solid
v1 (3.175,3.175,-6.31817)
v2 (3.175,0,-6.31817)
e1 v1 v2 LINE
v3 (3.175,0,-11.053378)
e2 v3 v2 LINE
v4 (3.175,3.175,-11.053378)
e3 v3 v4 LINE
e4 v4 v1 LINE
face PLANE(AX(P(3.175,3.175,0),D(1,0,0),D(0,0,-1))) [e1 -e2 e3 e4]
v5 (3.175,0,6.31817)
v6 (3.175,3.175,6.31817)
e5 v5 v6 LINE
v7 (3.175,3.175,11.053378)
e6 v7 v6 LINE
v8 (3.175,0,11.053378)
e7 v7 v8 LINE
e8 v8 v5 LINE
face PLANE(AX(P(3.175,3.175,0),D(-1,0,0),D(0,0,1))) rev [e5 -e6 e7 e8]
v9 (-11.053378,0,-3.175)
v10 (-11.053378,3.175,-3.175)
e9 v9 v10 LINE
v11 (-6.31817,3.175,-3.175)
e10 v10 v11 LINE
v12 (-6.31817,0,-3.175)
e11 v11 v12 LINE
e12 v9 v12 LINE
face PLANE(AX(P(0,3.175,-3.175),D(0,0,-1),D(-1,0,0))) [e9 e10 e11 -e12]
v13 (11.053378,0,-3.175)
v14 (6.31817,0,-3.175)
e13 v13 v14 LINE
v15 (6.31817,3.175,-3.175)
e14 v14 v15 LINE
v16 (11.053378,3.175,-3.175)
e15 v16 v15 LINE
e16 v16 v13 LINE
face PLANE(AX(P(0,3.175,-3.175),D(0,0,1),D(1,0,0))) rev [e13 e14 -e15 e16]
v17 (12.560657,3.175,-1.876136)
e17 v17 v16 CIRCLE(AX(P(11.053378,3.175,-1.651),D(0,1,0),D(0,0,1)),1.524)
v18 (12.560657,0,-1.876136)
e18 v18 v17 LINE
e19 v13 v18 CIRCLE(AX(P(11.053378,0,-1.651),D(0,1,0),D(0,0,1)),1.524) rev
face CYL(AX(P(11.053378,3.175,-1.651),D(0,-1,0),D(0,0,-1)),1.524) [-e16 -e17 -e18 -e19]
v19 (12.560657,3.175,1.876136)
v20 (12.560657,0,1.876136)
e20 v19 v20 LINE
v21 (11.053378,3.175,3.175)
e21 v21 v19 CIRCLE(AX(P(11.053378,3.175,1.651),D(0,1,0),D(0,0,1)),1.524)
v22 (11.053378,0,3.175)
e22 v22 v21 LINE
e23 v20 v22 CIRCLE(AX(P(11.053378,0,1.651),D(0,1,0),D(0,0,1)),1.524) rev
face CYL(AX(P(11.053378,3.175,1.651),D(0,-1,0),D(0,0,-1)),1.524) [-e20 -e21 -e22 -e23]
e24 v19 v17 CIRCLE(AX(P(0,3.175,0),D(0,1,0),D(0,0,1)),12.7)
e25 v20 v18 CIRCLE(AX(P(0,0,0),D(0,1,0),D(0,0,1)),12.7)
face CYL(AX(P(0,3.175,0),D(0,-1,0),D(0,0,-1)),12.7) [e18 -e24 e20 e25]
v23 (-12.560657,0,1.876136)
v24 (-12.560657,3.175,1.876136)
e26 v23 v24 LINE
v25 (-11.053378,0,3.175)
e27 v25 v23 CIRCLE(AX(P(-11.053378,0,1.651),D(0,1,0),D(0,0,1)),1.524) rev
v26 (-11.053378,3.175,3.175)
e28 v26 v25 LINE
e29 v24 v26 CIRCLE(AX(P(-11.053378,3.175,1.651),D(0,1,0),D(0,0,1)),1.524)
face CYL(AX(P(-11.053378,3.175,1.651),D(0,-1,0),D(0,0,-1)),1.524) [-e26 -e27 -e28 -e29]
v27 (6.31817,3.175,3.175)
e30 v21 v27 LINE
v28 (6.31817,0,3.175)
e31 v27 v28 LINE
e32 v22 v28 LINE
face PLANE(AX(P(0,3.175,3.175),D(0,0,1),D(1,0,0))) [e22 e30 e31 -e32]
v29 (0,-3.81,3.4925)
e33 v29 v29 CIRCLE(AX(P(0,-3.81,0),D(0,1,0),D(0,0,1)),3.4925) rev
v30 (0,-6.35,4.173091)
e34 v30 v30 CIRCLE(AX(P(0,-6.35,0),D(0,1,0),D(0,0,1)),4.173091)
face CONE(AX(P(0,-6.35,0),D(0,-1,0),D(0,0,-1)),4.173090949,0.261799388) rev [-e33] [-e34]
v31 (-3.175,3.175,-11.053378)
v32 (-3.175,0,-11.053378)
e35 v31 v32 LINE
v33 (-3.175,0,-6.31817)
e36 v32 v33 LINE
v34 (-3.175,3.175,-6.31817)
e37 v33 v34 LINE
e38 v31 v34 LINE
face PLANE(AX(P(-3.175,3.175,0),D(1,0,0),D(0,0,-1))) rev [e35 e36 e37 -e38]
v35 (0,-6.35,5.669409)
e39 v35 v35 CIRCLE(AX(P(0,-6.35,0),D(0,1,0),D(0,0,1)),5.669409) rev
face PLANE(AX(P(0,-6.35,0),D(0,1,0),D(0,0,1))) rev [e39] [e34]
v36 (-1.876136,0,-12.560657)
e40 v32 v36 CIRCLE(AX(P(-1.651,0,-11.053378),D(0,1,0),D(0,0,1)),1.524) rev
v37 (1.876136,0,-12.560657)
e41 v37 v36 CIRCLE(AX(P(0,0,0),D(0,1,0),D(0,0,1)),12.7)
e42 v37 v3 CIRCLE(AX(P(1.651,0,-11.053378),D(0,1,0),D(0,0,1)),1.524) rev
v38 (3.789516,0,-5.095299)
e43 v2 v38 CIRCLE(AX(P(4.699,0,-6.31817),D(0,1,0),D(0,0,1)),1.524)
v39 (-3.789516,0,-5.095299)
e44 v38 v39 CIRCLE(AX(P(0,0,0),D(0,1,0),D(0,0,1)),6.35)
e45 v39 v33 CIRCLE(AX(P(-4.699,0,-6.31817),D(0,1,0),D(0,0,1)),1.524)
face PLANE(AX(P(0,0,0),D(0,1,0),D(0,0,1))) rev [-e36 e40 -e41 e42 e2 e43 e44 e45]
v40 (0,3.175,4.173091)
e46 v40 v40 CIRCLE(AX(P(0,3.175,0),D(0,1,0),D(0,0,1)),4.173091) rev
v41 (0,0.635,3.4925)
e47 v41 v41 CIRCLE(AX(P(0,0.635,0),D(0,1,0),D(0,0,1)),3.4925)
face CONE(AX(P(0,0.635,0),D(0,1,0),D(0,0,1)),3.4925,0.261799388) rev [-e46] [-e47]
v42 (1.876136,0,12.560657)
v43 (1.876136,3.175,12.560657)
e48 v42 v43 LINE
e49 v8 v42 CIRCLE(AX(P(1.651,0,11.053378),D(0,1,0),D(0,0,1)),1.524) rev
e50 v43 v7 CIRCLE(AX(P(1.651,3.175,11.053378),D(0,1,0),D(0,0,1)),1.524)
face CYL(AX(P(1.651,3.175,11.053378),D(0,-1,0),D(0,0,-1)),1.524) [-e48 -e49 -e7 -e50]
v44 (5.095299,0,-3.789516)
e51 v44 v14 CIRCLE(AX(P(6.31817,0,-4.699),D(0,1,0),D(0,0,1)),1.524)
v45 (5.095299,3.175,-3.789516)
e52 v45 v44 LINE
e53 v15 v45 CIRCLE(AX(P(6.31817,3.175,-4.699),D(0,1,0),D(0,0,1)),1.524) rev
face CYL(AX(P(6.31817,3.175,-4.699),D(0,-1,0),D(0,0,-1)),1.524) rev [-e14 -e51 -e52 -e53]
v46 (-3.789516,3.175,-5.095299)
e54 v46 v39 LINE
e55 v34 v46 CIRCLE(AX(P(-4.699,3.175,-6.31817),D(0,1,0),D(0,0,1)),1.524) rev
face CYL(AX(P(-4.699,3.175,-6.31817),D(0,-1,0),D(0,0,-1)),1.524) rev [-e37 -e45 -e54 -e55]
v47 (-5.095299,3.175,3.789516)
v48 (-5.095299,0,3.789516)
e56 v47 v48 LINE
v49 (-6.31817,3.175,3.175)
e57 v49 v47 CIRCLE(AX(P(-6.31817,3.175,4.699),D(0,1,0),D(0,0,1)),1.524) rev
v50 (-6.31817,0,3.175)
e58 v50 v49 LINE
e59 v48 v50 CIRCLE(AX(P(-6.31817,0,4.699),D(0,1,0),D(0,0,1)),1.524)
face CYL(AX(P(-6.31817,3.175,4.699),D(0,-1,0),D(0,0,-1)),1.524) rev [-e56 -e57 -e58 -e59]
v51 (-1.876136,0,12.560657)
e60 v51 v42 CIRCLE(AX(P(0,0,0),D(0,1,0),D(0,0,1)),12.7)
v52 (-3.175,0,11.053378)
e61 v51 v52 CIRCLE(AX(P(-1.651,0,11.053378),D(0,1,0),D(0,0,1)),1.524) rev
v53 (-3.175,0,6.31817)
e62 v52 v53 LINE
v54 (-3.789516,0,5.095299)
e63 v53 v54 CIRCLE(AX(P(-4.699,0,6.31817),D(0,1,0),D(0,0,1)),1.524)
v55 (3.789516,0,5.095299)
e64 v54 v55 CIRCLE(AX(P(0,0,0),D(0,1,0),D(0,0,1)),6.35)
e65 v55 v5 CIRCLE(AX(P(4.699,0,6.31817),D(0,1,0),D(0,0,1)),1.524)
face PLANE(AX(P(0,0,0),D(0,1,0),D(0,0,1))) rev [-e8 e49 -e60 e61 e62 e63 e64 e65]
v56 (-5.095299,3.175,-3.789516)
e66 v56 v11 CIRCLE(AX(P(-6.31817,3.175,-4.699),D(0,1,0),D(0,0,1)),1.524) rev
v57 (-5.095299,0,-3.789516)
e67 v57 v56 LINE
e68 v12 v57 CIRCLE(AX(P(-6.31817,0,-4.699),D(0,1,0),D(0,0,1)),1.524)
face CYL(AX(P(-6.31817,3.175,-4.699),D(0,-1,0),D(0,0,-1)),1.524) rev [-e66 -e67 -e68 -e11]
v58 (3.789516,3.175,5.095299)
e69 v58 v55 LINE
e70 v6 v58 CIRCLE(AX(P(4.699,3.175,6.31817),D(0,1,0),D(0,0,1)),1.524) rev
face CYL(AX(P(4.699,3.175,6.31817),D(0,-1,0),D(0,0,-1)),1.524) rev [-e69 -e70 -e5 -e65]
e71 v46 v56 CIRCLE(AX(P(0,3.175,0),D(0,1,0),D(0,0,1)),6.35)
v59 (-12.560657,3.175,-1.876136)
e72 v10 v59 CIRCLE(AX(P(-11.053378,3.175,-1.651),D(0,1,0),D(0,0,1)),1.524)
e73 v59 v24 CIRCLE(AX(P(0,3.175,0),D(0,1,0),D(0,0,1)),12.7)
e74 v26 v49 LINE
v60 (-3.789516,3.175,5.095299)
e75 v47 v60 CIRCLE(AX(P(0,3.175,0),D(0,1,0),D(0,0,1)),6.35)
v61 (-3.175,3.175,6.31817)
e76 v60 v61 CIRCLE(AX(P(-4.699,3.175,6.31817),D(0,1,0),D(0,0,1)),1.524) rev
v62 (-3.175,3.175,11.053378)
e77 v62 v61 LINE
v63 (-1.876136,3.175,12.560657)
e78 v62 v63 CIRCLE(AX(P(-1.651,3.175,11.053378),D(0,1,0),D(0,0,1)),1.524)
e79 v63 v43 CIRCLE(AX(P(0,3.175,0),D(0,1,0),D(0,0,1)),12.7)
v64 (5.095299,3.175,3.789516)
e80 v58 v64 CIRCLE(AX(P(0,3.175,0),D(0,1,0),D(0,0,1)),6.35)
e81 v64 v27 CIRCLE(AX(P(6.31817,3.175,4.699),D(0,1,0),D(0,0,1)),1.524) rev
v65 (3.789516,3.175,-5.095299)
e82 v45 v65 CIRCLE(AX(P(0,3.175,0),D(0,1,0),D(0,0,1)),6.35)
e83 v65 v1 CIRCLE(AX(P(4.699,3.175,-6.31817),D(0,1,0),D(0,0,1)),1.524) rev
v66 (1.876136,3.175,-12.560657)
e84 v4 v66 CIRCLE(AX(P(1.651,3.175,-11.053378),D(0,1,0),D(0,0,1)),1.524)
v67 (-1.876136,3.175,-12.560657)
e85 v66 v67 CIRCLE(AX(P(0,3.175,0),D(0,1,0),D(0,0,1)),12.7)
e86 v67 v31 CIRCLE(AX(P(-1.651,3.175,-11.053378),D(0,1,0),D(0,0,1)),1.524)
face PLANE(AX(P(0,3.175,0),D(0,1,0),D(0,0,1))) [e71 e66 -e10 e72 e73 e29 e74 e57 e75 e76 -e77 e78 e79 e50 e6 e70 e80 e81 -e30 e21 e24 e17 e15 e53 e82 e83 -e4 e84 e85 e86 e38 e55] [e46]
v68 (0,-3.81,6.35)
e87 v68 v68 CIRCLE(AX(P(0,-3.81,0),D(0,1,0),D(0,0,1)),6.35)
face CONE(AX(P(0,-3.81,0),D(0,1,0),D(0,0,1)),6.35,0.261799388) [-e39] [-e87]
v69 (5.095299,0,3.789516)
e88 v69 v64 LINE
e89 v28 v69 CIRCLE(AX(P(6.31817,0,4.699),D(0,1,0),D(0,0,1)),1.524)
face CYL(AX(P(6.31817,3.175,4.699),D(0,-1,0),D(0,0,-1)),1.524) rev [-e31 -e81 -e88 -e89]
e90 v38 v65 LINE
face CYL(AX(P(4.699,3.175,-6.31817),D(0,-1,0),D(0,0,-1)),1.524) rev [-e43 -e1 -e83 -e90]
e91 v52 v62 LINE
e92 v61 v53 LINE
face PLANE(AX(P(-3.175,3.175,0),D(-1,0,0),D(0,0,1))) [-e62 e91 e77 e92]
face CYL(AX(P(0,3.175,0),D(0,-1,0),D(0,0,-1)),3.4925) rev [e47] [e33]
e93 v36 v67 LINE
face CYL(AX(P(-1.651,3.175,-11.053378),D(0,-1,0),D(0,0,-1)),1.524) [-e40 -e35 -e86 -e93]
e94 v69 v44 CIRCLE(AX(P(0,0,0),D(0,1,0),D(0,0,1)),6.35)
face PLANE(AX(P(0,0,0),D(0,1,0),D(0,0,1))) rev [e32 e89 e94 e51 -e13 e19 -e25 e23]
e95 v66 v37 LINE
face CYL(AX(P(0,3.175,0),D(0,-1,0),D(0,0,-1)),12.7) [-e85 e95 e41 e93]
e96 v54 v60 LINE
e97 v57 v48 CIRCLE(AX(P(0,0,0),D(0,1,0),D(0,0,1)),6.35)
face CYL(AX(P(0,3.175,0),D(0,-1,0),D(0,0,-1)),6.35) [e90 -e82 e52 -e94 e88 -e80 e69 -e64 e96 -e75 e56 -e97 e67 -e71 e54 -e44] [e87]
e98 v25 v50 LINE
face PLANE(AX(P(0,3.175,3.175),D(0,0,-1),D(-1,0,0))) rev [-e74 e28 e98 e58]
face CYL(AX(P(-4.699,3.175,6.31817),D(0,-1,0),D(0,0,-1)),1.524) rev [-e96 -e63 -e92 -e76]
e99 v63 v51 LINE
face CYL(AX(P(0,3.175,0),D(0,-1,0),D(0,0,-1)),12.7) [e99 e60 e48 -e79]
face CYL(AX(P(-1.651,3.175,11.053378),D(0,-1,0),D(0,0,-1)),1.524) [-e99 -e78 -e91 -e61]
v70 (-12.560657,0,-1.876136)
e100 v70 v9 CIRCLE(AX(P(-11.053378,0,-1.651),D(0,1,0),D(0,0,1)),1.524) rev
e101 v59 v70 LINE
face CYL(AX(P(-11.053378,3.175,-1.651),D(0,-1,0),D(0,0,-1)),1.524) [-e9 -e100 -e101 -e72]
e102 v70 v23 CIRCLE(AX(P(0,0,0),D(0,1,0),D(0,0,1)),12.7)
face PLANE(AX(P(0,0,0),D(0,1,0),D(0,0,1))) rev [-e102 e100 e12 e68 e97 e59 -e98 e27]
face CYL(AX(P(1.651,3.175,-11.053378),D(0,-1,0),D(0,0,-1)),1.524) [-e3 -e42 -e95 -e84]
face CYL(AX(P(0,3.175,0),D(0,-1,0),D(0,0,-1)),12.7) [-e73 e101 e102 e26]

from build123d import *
from OCP.BRepFilletAPI import BRepFilletAPI_MakeChamfer

# Parameters (mm, degrees)
SKETCH1_R           = 3.492500000000002
BOSS_EXTRUDE1_DEPTH = 3.175
BOSS_EXTRUDE2_START = -6.35
SKETCH1_3_R         = 3.4925
BOSS_EXTRUDE2_DEPTH = 6.35
CHAMFER1_SIZE       = 2.54
CHAMFER1_SIZE2      = 0.6805909487750533
FILLET2_R           = 1.524


with BuildPart() as part:
    # Sketch1 → Boss-Extrude1 (new body)
    with BuildSketch(Plane(origin=(0, 0, 0), x_dir=(1, 0, 0), z_dir=(0, 1, 0))):
        with BuildLine():
            ThreePointArc((-3.1750000000000007, 5.499261314031186), (-4.490128060534577, 4.490128060534578), (-5.499261314031186, 3.1750000000000016))
            Line((-5.499261314031183, 3.1750000000000007), (-12.296722124208548, 3.1750000000000034))
            ThreePointArc((-12.296722124208548, 3.175000000000004), (-12.700000000000001, 1.56e-15), (-12.29672212420855, -3.175000000000001))
            Line((-12.296722124208545, -3.1750000000000003), (-5.499261314031183, -3.175000000000001))
            ThreePointArc((-5.499261314031185, -3.175000000000003), (-4.490128060534575, -4.490128060534579), (-3.174999999999998, -5.499261314031186))
            Line((-3.174999999999998, -5.499261314031185), (-3.1749999999999976, -12.296722124208545))
            ThreePointArc((-3.1750000000000047, -12.296722124208548), (-2.33e-15, -12.700000000000001), (3.175, -12.29672212420855))
            Line((3.175000000000002, -12.296722124208543), (3.175000000000001, -5.499261314031185))
            ThreePointArc((3.175, -5.499261314031186), (4.490128060534578, -4.490128060534577), (5.499261314031187, -3.1749999999999994))
            Line((5.499261314031186, -3.1749999999999985), (12.296722124208548, -3.1749999999999954))
            ThreePointArc((12.296722124208552, -3.174999999999996), (12.700000000000003, 4.44e-15), (12.296722124208548, 3.1750000000000043))
            Line((12.296722124208546, 3.1750000000000043), (5.499261314031185, 3.1750000000000007))
            ThreePointArc((5.499261314031187, 3.175), (4.490128060534579, 4.490128060534575), (3.1749999999999994, 5.499261314031187))
            Line((3.1749999999999994, 5.499261314031186), (3.175, 12.296722124208548))
            ThreePointArc((3.1750000000000003, 12.29672212420855), (8.9e-16, 12.700000000000001), (-3.1749999999999985, 12.29672212420855))
            Line((-3.1749999999999994, 12.29672212420855), (-3.175, 5.499261314031185))
        make_face()
        with Locations(Location((-1.22e-15, -1.22e-15, 0), (0, 0, 270))):
            Circle(SKETCH1_R, mode=Mode.SUBTRACT)
    extrude(amount=BOSS_EXTRUDE1_DEPTH)

    # Sketch1<3> → Boss-Extrude2 (add)
    with BuildSketch(Plane(origin=(0, 0, 0), x_dir=(1, 0, 0), z_dir=(0, 1, 0)).offset(BOSS_EXTRUDE2_START)):
        with BuildLine():
            ThreePointArc((3.174999999999999, 5.499261314031186), (-1.02e-15, 6.35), (-3.175000000000001, 5.499261314031184))
            ThreePointArc((-3.175000000000001, 5.499261314031184), (-4.490128060534576, 4.490128060534577), (-5.499261314031184, 3.175000000000002))
            ThreePointArc((-5.499261314031184, 3.175000000000002), (-6.35, 7.8e-16), (-5.499261314031185, -3.1750000000000007))
            ThreePointArc((-5.499261314031185, -3.1750000000000007), (-4.490128060534575, -4.490128060534578), (-3.174999999999997, -5.499261314031187))
            ThreePointArc((-3.174999999999997, -5.499261314031187), (-1.17e-15, -6.35), (3.1750000000000007, -5.499261314031185))
            ThreePointArc((3.1750000000000007, -5.499261314031185), (4.4901280605345795, -4.490128060534573), (5.499261314031187, -3.1749999999999976))
            ThreePointArc((5.499261314031187, -3.1749999999999976), (6.133628996935584, -1.6435009364010063), (6.35, -1.56e-15))
            ThreePointArc((6.35, 0), (6.133628996935584, 1.6435009364010074), (5.499261314031185, 3.1750000000000007))
            ThreePointArc((5.499261314031185, 3.1750000000000007), (4.490128060534575, 4.490128060534578), (3.174999999999999, 5.499261314031186))
        make_face()
        with Locations(Location((0, 0, 0), (0, 0, 270))):
            Circle(SKETCH1_3_R, mode=Mode.SUBTRACT)
    extrude(amount=BOSS_EXTRUDE2_DEPTH)

    # Chamfer1: one chamfer whose edges measure the first distance from different faces: ONE call of the kernel's chamfer builder (chamfer() names one face for all edges)
    chamfer1_edges_1 = [part.edges().sort_by_distance(p)[0] for p in [
        (3.174999999999999, -6.35, -5.499261314031194),
    ]]
    chamfer1_side_1 = [part.faces().sort_by_distance(p)[0] for p in [
        (3.1749999999999865, -3.175, -5.499261314031195),
    ]]
    chamfer1_edges_2 = [part.edges().sort_by_distance(p)[0] for p in [
        (1.07e-15, -6.35, -3.4925),
    ]]
    chamfer1_side_2 = [part.faces().sort_by_distance(p)[0] for p in [
        (1.07e-15, -3.175, -3.4925),
    ]]
    chamfer1_edges_3 = [part.edges().sort_by_distance(p)[0] for p in [
        (-1.5e-16, 3.175, -3.4925000000000006),
    ]]
    chamfer1_side_3 = [part.faces().sort_by_distance(p)[0] for p in [
        (-1.5e-16, 1.5875, -3.4925000000000006),
    ]]
    chamfer1 = BRepFilletAPI_MakeChamfer(part.part.solid().wrapped)
    for e in chamfer1_edges_1:
        chamfer1.Add(CHAMFER1_SIZE, CHAMFER1_SIZE2, e.wrapped, chamfer1_side_1[0].wrapped)  # the first distance lies on this face
    for e in chamfer1_edges_2:
        chamfer1.Add(CHAMFER1_SIZE, CHAMFER1_SIZE2, e.wrapped, chamfer1_side_2[0].wrapped)  # the first distance lies on this face
    for e in chamfer1_edges_3:
        chamfer1.Add(CHAMFER1_SIZE, CHAMFER1_SIZE2, e.wrapped, chamfer1_side_3[0].wrapped)  # the first distance lies on this face
    add(Compound.cast(chamfer1.Shape()), mode=Mode.REPLACE)

    # Fillet2
    # the kernel refuses this fillet: 1.524 mm, written as the material it adds along each edge
    with BuildSketch(Plane(origin=(3.174999999999999, 0, -5.499261314031187), x_dir=(0.8356194334098631, 0, 0.5493088043239243), z_dir=(0, 1, 0))) as fillet2_piece_1:
        with BuildLine():
            CenterArc((0.8236501414377054, 1.5214428185116744), FILLET2_R, 213.3196069721482, 53.36078605570344)
            Line((-0.44983387507892547, 0.684296200722013), (0, 0))
            ThreePointArc((0, 0), (0.36770095599897257, 0.01065492286802295), (0.7354019119979484, -1e-17))
        make_face()
    extrude(amount=3.175)
    with BuildSketch(Plane(origin=(5.499261314031186, 0, -3.1750000000000007), x_dir=(1, 0, -1.08e-15), z_dir=(0, 1, 0))) as fillet2_piece_2:
        with BuildLine():
            CenterArc((0.8189089115958533, 1.524), FILLET2_R, 216.63921394429647, 53.3607860557035)
            ThreePointArc((-0.40396274497712104, 0.6145161290322583), (-0.19307791187855783, 0.31311090745692627), (0, 0))
            Line((0, 0), (0.8189089115958526, 0))
        make_face()
    extrude(amount=3.175)
    with BuildSketch(Plane(origin=(5.499261314031186, 0, 3.174999999999999), x_dir=(-0.5493088043239248, 0, 0.8356194334098627), z_dir=(0, 1, 0))) as fillet2_piece_3:
        with BuildLine():
            CenterArc((0.8236501414377031, 1.521442818511675), FILLET2_R, 213.31960697214825, 53.3607860557035)
            Line((-0.44983387507892714, 0.6842962007220129), (0, 0))
            ThreePointArc((0, 0), (0.3677009559989749, 0.01065492286802371), (0.7354019119979491, 1e-17))
        make_face()
    extrude(amount=3.175)
    with BuildSketch(Plane(origin=(3.1750000000000007, 0, 5.499261314031186), x_dir=(1.08e-15, 0, 1), z_dir=(0, 1, 0))) as fillet2_piece_4:
        with BuildLine():
            CenterArc((0.8189089115958524, 1.524), FILLET2_R, 216.63921394429642, 53.36078605570356)
            ThreePointArc((-0.4039627449771237, 0.61451612903226), (-0.19307791187855872, 0.3131109074569276), (0, 0))
            Line((0, 0), (0.8189089115958508, 0))
        make_face()
    extrude(amount=3.175)
    with BuildSketch(Plane(origin=(-3.1749999999999976, 0, 5.499261314031186), x_dir=(-0.8356194334098629, 0, -0.5493088043239246), z_dir=(0, 1, 0))) as fillet2_piece_5:
        with BuildLine():
            CenterArc((0.8236501414377089, 1.5214428185116742), FILLET2_R, 213.3196069721482, 53.3607860557035)
            Line((-0.44983387507892214, 0.684296200722013), (0, 0))
            ThreePointArc((0, 0), (0.3677009559989767, 0.0106549228680226), (0.7354019119979527, 1e-17))
        make_face()
    extrude(amount=3.175)
    with BuildSketch(Plane(origin=(-5.499261314031184, 0, 3.1750000000000025), x_dir=(-1, 0, -1.08e-15), z_dir=(0, 1, 0))) as fillet2_piece_6:
        with BuildLine():
            CenterArc((0.81890891159585, 1.524), FILLET2_R, 216.6392139442966, 53.36078605570344)
            ThreePointArc((-0.40396274497712237, 0.6145161290322556), (-0.1930779118785585, 0.31311090745692494), (0, 0))
            Line((0, 0), (0.8189089115958517, 0))
        make_face()
    extrude(amount=3.175)
    with BuildSketch(Plane(origin=(-5.499261314031185, 0, -3.1750000000000016), x_dir=(0.5493088043239243, 0, -0.835619433409863), z_dir=(0, 1, 0))) as fillet2_piece_7:
        with BuildLine():
            CenterArc((0.8236501414377072, 1.5214428185116744), FILLET2_R, 213.31960697214814, 53.3607860557035)
            Line((-0.44983387507892447, 0.6842962007220147), (0, 0))
            ThreePointArc((0, 0), (0.3677009559989745, 0.01065492286802321), (0.7354019119979499, -1e-17))
        make_face()
    extrude(amount=3.175)
    with BuildSketch(Plane(origin=(-3.1750000000000007, 0, -5.499261314031186), x_dir=(1.08e-15, 0, -1), z_dir=(0, 1, 0))) as fillet2_piece_8:
        with BuildLine():
            CenterArc((0.8189089115958518, 1.524), FILLET2_R, 216.63921394429659, 53.3607860557035)
            ThreePointArc((-0.4039627449771215, 0.614516129032256), (-0.19307791187855938, 0.3131109074569254), (0, 0))
            Line((0, 0), (0.8189089115958534, 0))
        make_face()
    extrude(amount=3.175)
    # the kernel refuses this fillet: 1.524 mm, written as the material it takes off along each edge
    with BuildSketch(Plane(origin=(3.175, -3.313522044377113, -12.29672212420855), x_dir=(-0.9799720802882134, 0, -0.1991349337901098), z_dir=(0, 1, 0))) as fillet2_2_piece_1:
        with BuildLine():
            CenterArc((1.2458842886857948, 1.5219237330684425), FILLET2_R, 191.48637688209308, 81.5047584217437)
            Line((-0.24759316167344236, 1.218442093972315), (0, 0))
            ThreePointArc((0, 0), (0.662704408875422, -0.01730222442965028), (1.325408817750845, 1e-17))
        make_face()
    extrude(amount=9.802044088754226, mode=Mode.SUBTRACT)
    with BuildSketch(Plane(origin=(12.29672212420855, -3.313522044377107, -3.175000000000003), x_dir=(0.1991349337901089, 0, 0.9799720802882137), z_dir=(0, 1, 0))) as fillet2_2_piece_2:
        with BuildLine():
            CenterArc((1.2458842886857953, -1.521923733068443), FILLET2_R, 87.00886469616333, 81.50475842174347)
            Line((-0.24759316167344145, -1.218442093972312), (0, 0))
            ThreePointArc((0, 0), (0.6627044088754213, 0.01730222442965107), (1.3254088177508423, 1e-17))
        make_face()
    extrude(amount=9.802044088754215, mode=Mode.SUBTRACT)
    with BuildSketch(Plane(origin=(12.29672212420855, -3.3135220443771116, 3.1749999999999954), x_dir=(0.19913493379011118, 0, -0.979972080288213), z_dir=(0, 1, 0))) as fillet2_2_piece_3:
        with BuildLine():
            CenterArc((1.2458842886857922, 1.5219237330684423), FILLET2_R, 191.48637688209323, 81.50475842174365)
            Line((-0.24759316167344428, 1.218442093972311), (0, 0))
            ThreePointArc((0, 0), (0.6627044088754224, -0.0173022244296529), (1.3254088177508445, -3e-17))
        make_face()
    extrude(amount=9.802044088754222, mode=Mode.SUBTRACT)
    with BuildSketch(Plane(origin=(3.175000000000002, -3.3135220443771143, 12.296722124208548), x_dir=(0, 0, -1), z_dir=(0, 1, 0))) as fillet2_2_piece_4:
        with BuildLine():
            CenterArc((1.2433436813975014, 1.524), FILLET2_R, 188.4952415782562, 81.50475842174376)
            ThreePointArc((-0.26393519716764224, 1.2988636363636379), (-0.14892329545176253, 0.6459863408655986), (0, 0))
            Line((0, 0), (1.2433436813975014, 0))
        make_face()
    extrude(amount=9.80204408875423, mode=Mode.SUBTRACT)
    with BuildSketch(Plane(origin=(-3.1749999999999976, -3.3135220443771236, 12.29672212420855), x_dir=(0.9799720802882134, 0, 0.1991349337901098), z_dir=(0, 1, 0))) as fillet2_2_piece_5:
        with BuildLine():
            CenterArc((1.2458842886857944, 1.5219237330684423), FILLET2_R, 191.48637688209308, 81.50475842174376)
            Line((-0.2475931616734428, 1.218442093972315), (0, 0))
            ThreePointArc((0, 0), (0.6627044088754224, -0.01730222442965202), (1.325408817750845, 1e-17))
        make_face()
    extrude(amount=9.802044088754247, mode=Mode.SUBTRACT)
    with BuildSketch(Plane(origin=(-12.29672212420855, -3.313522044377118, 3.1750000000000003), x_dir=(1, 0, 0), z_dir=(0, 1, 0))) as fillet2_2_piece_6:
        with BuildLine():
            CenterArc((1.2433436813975014, 1.524), FILLET2_R, 188.4952415782562, 81.50475842174376)
            ThreePointArc((-0.26393519716764224, 1.298863636363638), (-0.1489232954517643, 0.6459863408655999), (0, 0))
            Line((0, 0), (1.2433436813975014, 0))
        make_face()
    extrude(amount=9.802044088754236, mode=Mode.SUBTRACT)
    with BuildSketch(Plane(origin=(-12.29672212420855, -3.313522044377115, -3.1750000000000034), x_dir=(-0.1991349337901111, 0, 0.9799720802882133), z_dir=(0, 1, 0))) as fillet2_2_piece_7:
        with BuildLine():
            CenterArc((1.2458842886857935, 1.5219237330684425), FILLET2_R, 191.4863768820932, 81.50475842174365)
            Line((-0.24759316167344286, 1.2184420939723115), (0, 0))
            ThreePointArc((0, 0), (0.662704408875423, -0.01730222442965109), (1.3254088177508456, -2e-17))
        make_face()
    extrude(amount=9.802044088754231, mode=Mode.SUBTRACT)
    with BuildSketch(Plane(origin=(-3.1749999999999994, -3.3135220443771085, -12.296722124208546), x_dir=(0, 0, 1), z_dir=(0, 1, 0))) as fillet2_2_piece_8:
        with BuildLine():
            CenterArc((1.2433436813974978, 1.524), FILLET2_R, 188.4952415782563, 81.5047584217437)
            ThreePointArc((-0.2639351971676458, 1.2988636363636357), (-0.1489232954517643, 0.6459863408655977), (0, 0))
            Line((0, 0), (1.2433436813974978, 0))
        make_face()
    extrude(amount=9.802044088754217, mode=Mode.SUBTRACT)


solid = part.part
